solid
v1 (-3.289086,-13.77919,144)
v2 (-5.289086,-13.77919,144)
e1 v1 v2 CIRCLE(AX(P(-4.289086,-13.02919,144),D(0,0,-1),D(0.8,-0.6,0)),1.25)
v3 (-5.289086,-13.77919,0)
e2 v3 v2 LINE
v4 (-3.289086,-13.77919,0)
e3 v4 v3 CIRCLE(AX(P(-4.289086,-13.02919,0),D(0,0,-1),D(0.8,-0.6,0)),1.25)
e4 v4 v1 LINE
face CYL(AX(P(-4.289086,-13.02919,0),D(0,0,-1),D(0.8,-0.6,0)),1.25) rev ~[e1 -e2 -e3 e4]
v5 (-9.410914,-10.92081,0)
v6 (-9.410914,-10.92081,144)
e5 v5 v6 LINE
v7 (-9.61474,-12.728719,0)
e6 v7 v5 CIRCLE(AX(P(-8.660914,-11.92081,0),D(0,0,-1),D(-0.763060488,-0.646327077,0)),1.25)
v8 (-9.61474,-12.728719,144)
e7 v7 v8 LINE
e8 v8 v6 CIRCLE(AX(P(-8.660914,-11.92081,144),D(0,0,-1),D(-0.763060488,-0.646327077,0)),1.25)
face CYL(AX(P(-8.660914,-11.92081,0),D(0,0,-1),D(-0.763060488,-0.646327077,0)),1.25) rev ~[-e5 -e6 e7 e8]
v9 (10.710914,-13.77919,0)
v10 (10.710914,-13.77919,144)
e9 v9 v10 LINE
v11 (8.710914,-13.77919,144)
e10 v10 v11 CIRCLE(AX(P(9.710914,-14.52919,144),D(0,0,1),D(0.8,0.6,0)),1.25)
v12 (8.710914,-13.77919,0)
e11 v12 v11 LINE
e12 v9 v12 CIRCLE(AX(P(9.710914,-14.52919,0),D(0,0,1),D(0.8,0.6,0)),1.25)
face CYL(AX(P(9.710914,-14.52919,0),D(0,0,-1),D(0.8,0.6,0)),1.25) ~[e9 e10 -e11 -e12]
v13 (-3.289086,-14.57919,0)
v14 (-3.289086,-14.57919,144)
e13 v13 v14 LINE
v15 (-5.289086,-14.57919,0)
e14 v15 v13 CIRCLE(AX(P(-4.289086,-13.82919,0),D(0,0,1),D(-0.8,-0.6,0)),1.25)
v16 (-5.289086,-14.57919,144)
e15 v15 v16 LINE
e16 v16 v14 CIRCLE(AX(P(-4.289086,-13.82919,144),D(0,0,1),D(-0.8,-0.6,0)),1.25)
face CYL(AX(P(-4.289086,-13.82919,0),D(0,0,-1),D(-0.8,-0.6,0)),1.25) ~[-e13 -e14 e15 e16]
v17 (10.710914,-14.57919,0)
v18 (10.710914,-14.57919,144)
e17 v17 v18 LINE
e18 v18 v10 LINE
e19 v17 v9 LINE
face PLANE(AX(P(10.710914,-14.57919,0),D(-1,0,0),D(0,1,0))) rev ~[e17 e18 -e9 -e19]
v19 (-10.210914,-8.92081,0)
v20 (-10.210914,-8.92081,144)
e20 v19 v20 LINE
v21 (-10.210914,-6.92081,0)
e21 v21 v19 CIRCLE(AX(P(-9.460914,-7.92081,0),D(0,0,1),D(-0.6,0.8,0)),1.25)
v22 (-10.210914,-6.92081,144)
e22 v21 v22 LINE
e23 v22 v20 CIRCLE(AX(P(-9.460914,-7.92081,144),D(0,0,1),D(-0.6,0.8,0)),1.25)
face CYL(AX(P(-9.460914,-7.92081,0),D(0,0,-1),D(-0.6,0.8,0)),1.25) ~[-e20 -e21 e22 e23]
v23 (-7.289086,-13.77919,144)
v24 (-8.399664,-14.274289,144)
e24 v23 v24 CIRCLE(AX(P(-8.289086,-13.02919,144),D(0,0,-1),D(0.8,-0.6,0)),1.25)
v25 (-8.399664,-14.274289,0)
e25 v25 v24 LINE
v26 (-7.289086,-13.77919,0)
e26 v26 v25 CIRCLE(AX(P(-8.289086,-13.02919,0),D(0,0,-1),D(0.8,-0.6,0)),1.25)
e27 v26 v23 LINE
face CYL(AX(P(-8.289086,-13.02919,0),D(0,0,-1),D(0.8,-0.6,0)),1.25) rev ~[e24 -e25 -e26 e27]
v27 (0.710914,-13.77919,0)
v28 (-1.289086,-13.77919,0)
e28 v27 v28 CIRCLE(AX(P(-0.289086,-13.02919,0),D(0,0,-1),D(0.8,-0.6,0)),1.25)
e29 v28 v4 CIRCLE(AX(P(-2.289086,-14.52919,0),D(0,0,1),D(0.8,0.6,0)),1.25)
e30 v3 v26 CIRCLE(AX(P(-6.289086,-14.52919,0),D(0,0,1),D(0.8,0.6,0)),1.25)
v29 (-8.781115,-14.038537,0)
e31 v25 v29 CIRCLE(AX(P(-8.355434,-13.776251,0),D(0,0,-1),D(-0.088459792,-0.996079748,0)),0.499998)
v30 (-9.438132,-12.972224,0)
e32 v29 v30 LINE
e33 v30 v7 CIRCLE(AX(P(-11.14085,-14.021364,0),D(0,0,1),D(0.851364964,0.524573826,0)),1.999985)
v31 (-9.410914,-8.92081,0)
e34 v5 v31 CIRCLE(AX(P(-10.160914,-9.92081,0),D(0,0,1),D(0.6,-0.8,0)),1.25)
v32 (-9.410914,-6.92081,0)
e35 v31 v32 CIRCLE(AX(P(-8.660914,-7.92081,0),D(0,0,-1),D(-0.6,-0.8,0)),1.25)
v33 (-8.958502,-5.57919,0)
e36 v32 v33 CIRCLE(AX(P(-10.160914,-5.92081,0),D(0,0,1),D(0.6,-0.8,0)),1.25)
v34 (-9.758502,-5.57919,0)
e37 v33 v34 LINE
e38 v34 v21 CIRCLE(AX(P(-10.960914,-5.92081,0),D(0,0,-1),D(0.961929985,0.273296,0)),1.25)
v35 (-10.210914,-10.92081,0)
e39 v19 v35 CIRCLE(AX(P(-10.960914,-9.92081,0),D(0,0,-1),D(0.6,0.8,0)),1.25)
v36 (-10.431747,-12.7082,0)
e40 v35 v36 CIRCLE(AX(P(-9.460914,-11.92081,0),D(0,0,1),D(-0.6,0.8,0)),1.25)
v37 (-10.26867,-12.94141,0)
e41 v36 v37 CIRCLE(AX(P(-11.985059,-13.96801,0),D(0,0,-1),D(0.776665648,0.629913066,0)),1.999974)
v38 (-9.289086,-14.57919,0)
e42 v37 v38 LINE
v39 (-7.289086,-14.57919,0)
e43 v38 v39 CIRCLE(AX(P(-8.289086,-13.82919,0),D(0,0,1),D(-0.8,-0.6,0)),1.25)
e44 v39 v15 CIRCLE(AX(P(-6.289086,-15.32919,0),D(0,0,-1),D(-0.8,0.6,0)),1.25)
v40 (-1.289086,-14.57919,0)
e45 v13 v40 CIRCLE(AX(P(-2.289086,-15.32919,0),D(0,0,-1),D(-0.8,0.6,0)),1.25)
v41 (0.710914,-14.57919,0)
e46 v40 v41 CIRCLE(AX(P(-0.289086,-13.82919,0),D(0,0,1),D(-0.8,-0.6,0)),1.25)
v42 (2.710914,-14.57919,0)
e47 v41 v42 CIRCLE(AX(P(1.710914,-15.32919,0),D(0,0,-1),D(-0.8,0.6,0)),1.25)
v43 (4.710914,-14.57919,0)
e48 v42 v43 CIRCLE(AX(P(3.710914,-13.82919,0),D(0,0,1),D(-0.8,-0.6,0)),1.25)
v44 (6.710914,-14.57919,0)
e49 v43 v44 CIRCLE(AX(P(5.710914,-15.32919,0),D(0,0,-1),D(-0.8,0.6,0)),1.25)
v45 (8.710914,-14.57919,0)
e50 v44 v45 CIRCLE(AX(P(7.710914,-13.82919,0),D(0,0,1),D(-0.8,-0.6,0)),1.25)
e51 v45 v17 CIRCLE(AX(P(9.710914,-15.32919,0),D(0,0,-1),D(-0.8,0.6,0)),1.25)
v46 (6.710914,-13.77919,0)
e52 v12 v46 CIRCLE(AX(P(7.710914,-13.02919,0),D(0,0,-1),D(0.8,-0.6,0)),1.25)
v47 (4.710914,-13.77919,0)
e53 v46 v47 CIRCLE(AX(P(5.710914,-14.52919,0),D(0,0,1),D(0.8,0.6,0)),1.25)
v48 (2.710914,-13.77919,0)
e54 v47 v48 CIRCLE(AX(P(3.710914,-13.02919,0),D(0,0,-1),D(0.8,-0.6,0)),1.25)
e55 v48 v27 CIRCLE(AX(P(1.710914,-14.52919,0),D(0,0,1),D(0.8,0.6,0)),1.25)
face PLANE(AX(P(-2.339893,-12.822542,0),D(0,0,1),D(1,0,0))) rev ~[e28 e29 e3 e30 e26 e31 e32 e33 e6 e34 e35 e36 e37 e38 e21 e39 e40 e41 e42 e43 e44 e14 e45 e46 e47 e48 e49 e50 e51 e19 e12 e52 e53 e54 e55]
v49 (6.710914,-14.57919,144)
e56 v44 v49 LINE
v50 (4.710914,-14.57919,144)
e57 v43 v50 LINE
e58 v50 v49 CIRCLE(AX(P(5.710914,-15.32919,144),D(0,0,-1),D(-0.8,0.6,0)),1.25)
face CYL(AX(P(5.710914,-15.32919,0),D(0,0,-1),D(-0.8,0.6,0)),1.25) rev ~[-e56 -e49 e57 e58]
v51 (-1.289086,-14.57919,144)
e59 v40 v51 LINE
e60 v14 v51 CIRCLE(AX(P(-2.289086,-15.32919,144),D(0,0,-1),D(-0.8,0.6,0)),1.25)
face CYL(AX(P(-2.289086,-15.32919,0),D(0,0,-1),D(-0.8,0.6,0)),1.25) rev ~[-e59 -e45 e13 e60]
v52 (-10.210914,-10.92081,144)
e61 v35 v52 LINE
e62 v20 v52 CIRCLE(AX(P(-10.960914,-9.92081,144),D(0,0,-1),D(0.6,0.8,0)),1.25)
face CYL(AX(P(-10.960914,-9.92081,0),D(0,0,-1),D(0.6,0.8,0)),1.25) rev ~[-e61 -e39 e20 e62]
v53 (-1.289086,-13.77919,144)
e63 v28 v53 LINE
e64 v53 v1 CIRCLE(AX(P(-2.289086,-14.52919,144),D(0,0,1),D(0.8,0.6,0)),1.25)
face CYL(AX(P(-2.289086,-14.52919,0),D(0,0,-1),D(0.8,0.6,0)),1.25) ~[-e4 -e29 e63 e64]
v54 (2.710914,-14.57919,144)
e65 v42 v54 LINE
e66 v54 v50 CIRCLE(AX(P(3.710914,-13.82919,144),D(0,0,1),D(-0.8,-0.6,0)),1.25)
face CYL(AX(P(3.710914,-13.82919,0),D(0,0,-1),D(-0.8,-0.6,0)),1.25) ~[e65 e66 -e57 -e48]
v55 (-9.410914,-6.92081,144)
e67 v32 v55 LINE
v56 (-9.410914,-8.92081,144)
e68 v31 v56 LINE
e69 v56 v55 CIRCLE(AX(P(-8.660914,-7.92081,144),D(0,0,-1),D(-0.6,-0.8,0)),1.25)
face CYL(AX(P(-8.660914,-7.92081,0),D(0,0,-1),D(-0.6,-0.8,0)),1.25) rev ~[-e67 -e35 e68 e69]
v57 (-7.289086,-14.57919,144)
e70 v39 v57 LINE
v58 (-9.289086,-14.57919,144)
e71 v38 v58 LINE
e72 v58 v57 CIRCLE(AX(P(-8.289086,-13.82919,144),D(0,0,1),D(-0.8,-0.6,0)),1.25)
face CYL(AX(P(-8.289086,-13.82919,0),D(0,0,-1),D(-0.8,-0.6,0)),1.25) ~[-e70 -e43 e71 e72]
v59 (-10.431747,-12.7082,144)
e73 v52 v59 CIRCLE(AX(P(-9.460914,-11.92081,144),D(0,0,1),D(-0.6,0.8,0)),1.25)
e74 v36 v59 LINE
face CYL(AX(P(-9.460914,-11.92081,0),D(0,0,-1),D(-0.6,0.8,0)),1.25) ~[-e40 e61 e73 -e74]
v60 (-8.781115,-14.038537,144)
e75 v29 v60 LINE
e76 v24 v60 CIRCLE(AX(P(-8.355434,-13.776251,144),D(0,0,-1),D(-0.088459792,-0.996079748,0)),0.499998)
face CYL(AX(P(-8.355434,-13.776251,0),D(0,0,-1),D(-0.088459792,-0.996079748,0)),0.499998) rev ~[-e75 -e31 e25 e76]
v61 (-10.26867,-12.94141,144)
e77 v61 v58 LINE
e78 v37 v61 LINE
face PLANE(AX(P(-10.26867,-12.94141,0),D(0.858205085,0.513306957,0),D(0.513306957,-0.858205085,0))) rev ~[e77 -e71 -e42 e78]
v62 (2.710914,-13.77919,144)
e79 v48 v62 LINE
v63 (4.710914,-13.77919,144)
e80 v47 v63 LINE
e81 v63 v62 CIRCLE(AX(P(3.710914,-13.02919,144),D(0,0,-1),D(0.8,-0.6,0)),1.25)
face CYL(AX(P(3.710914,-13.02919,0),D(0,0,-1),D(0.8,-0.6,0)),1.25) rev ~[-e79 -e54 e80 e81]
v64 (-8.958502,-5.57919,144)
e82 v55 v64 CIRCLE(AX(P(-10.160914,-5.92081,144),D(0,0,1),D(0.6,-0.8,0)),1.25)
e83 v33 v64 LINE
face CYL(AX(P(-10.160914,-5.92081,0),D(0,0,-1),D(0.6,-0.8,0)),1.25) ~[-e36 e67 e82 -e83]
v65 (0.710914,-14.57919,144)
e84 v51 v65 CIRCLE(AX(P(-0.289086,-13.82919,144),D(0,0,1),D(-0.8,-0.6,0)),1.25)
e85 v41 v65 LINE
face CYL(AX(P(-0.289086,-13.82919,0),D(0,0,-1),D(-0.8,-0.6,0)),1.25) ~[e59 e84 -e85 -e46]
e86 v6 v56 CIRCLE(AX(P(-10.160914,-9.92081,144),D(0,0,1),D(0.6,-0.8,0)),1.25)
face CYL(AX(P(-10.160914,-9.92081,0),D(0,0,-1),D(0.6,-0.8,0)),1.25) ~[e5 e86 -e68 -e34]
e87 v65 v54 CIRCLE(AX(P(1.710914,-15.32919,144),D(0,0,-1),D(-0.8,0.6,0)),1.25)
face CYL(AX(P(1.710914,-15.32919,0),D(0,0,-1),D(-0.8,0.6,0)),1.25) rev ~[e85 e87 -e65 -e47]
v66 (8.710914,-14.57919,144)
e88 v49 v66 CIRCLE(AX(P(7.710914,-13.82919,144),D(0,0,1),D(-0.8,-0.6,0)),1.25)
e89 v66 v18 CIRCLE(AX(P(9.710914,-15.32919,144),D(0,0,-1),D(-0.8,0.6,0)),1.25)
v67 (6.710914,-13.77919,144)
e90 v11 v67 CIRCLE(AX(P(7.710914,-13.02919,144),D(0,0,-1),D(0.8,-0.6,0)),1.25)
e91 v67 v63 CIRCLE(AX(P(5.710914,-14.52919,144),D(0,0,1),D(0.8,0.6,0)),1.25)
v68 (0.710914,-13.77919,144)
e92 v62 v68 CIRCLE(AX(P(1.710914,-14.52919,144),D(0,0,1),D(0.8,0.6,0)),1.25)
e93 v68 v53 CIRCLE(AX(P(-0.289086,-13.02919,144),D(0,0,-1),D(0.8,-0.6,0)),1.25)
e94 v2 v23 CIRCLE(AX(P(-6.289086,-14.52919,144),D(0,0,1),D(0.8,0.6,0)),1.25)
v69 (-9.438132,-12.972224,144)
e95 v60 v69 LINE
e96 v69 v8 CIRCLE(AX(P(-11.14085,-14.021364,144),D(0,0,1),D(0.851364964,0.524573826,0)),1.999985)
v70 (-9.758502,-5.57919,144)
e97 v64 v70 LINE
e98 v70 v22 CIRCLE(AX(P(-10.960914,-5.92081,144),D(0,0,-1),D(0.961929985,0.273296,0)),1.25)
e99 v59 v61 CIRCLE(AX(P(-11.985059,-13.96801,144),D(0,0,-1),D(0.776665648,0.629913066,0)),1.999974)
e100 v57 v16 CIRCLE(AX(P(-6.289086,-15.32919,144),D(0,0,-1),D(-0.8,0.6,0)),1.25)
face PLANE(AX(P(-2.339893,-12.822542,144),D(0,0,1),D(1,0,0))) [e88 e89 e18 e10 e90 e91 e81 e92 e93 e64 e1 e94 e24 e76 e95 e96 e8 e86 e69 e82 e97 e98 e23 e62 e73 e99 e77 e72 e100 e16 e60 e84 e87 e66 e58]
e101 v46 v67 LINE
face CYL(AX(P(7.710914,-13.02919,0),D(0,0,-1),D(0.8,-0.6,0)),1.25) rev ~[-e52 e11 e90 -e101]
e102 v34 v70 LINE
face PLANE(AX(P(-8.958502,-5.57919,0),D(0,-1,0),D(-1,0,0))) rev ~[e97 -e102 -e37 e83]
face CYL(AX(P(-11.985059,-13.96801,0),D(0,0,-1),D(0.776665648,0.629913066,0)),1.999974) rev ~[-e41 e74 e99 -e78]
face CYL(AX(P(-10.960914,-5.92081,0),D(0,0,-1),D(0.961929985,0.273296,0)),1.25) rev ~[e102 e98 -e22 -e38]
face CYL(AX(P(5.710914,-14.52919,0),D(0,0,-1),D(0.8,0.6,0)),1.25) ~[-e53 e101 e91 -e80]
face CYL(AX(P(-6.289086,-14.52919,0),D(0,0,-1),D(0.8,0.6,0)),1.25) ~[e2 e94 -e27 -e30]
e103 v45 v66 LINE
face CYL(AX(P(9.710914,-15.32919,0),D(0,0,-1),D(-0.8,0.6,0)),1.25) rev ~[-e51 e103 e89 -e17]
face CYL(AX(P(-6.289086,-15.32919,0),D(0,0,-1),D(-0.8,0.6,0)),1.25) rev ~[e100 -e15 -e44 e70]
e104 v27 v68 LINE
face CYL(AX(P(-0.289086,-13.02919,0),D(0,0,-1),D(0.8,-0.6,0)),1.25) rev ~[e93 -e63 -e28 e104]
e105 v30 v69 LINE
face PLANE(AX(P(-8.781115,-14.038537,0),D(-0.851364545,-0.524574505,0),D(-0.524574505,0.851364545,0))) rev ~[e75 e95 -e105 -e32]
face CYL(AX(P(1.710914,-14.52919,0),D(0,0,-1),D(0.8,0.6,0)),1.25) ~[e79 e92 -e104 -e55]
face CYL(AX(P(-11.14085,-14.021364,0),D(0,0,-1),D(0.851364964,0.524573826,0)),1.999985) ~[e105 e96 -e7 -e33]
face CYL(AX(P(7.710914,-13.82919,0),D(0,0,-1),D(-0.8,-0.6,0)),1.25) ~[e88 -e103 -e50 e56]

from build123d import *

# Parameters (mm, degrees)
F1_DEPTH = 144


# Not quite as in the source:
# - ends of sketch curves that miss each other by under 0.0002 mm in the source are joined


with BuildPart() as f1:
    # F0 (on Top) → F1 (new body)
    with BuildSketch(Plane.XY):
        with BuildLine():
            ThreePointArc((-9.410914, -8.92081), (-9.910914, -7.92081), (-9.410914, -6.92081))
            ThreePointArc((-9.410914, -6.92081), (-8.9764458997, -6.320228727), (-8.9585015185, -5.57919))
            Line((-8.9585015185, -5.57919), (-9.7585015185, -5.57919))
            ThreePointArc((-9.7585015185, -5.57919), (-9.7764458997, -6.320228727), (-10.210914, -6.92081))
            ThreePointArc((-10.210914, -6.92081), (-10.710914, -7.92081), (-10.210914, -8.92081))
            ThreePointArc((-10.210914, -8.92081), (-9.710914, -9.92081), (-10.210914, -10.92081))
            ThreePointArc((-10.210914, -10.92081), (-10.7014813869, -11.7675371761), (-10.4317470851, -12.708200069))
            ThreePointArc((-10.4317470851, -12.708200069), (-10.3460553781, -12.8219008439), (-10.2686699127, -12.9414099478))
            Line((-10.2686699127, -12.9414099478), (-9.289086, -14.57919))
            ThreePointArc((-9.289086, -14.57919), (-8.289086, -15.07919), (-7.289086, -14.57919))
            ThreePointArc((-7.289086, -14.57919), (-6.289086, -14.07919), (-5.289086, -14.57919))
            ThreePointArc((-5.289086, -14.57919), (-4.289086, -15.07919), (-3.289086, -14.57919))
            ThreePointArc((-3.289086, -14.57919), (-2.289086, -14.07919), (-1.289086, -14.57919))
            ThreePointArc((-1.289086, -14.57919), (-0.289086, -15.07919), (0.710914, -14.57919))
            ThreePointArc((0.710914, -14.57919), (1.710914, -14.07919), (2.710914, -14.57919))
            ThreePointArc((2.710914, -14.57919), (3.710914, -15.07919), (4.710914, -14.57919))
            ThreePointArc((4.710914, -14.57919), (5.710914, -14.07919), (6.710914, -14.57919))
            ThreePointArc((6.710914, -14.57919), (7.710914, -15.07919), (8.710914, -14.57919))
            ThreePointArc((8.710914, -14.57919), (9.710914, -14.07919), (10.710914, -14.57919))
            Line((10.710914, -14.57919), (10.710914, -13.77919))
            ThreePointArc((10.710914, -13.77919), (9.710914, -13.27919), (8.710914, -13.77919))
            ThreePointArc((8.710914, -13.77919), (7.710914, -14.27919), (6.710914, -13.77919))
            ThreePointArc((6.710914, -13.77919), (5.710914, -13.27919), (4.710914, -13.77919))
            ThreePointArc((4.710914, -13.77919), (3.710914, -14.27919), (2.710914, -13.77919))
            ThreePointArc((2.710914, -13.77919), (1.710914, -13.27919), (0.710914, -13.77919))
            ThreePointArc((0.710914, -13.77919), (-0.289086, -14.27919), (-1.289086, -13.77919))
            ThreePointArc((-1.289086, -13.77919), (-2.289086, -13.27919), (-3.289086, -13.77919))
            ThreePointArc((-3.289086, -13.77919), (-4.289086, -14.27919), (-5.289086, -13.77919))
            ThreePointArc((-5.289086, -13.77919), (-6.289086, -13.27919), (-7.289086, -13.77919))
            ThreePointArc((-7.289086, -13.77919), (-7.7801177198, -14.1708779126), (-8.3996640349, -14.2742893929))
            ThreePointArc((-8.3996640349, -14.2742893929), (-8.6183007719, -14.2015740347), (-8.7811153103, -14.0385371912))
            Line((-8.7811153103, -14.0385371912), (-9.438132, -12.972224))
            ThreePointArc((-9.438132, -12.972224), (-9.5218512465, -12.8471466938), (-9.6147395194, -12.7287194399))
            ThreePointArc((-9.6147395194, -12.7287194399), (-9.9030448701, -11.7807710715), (-9.410914, -10.92081))
            ThreePointArc((-9.410914, -10.92081), (-8.910914, -9.92081), (-9.410914, -8.92081))
        make_face()
    extrude(amount=F1_DEPTH)


solid = f1.part
